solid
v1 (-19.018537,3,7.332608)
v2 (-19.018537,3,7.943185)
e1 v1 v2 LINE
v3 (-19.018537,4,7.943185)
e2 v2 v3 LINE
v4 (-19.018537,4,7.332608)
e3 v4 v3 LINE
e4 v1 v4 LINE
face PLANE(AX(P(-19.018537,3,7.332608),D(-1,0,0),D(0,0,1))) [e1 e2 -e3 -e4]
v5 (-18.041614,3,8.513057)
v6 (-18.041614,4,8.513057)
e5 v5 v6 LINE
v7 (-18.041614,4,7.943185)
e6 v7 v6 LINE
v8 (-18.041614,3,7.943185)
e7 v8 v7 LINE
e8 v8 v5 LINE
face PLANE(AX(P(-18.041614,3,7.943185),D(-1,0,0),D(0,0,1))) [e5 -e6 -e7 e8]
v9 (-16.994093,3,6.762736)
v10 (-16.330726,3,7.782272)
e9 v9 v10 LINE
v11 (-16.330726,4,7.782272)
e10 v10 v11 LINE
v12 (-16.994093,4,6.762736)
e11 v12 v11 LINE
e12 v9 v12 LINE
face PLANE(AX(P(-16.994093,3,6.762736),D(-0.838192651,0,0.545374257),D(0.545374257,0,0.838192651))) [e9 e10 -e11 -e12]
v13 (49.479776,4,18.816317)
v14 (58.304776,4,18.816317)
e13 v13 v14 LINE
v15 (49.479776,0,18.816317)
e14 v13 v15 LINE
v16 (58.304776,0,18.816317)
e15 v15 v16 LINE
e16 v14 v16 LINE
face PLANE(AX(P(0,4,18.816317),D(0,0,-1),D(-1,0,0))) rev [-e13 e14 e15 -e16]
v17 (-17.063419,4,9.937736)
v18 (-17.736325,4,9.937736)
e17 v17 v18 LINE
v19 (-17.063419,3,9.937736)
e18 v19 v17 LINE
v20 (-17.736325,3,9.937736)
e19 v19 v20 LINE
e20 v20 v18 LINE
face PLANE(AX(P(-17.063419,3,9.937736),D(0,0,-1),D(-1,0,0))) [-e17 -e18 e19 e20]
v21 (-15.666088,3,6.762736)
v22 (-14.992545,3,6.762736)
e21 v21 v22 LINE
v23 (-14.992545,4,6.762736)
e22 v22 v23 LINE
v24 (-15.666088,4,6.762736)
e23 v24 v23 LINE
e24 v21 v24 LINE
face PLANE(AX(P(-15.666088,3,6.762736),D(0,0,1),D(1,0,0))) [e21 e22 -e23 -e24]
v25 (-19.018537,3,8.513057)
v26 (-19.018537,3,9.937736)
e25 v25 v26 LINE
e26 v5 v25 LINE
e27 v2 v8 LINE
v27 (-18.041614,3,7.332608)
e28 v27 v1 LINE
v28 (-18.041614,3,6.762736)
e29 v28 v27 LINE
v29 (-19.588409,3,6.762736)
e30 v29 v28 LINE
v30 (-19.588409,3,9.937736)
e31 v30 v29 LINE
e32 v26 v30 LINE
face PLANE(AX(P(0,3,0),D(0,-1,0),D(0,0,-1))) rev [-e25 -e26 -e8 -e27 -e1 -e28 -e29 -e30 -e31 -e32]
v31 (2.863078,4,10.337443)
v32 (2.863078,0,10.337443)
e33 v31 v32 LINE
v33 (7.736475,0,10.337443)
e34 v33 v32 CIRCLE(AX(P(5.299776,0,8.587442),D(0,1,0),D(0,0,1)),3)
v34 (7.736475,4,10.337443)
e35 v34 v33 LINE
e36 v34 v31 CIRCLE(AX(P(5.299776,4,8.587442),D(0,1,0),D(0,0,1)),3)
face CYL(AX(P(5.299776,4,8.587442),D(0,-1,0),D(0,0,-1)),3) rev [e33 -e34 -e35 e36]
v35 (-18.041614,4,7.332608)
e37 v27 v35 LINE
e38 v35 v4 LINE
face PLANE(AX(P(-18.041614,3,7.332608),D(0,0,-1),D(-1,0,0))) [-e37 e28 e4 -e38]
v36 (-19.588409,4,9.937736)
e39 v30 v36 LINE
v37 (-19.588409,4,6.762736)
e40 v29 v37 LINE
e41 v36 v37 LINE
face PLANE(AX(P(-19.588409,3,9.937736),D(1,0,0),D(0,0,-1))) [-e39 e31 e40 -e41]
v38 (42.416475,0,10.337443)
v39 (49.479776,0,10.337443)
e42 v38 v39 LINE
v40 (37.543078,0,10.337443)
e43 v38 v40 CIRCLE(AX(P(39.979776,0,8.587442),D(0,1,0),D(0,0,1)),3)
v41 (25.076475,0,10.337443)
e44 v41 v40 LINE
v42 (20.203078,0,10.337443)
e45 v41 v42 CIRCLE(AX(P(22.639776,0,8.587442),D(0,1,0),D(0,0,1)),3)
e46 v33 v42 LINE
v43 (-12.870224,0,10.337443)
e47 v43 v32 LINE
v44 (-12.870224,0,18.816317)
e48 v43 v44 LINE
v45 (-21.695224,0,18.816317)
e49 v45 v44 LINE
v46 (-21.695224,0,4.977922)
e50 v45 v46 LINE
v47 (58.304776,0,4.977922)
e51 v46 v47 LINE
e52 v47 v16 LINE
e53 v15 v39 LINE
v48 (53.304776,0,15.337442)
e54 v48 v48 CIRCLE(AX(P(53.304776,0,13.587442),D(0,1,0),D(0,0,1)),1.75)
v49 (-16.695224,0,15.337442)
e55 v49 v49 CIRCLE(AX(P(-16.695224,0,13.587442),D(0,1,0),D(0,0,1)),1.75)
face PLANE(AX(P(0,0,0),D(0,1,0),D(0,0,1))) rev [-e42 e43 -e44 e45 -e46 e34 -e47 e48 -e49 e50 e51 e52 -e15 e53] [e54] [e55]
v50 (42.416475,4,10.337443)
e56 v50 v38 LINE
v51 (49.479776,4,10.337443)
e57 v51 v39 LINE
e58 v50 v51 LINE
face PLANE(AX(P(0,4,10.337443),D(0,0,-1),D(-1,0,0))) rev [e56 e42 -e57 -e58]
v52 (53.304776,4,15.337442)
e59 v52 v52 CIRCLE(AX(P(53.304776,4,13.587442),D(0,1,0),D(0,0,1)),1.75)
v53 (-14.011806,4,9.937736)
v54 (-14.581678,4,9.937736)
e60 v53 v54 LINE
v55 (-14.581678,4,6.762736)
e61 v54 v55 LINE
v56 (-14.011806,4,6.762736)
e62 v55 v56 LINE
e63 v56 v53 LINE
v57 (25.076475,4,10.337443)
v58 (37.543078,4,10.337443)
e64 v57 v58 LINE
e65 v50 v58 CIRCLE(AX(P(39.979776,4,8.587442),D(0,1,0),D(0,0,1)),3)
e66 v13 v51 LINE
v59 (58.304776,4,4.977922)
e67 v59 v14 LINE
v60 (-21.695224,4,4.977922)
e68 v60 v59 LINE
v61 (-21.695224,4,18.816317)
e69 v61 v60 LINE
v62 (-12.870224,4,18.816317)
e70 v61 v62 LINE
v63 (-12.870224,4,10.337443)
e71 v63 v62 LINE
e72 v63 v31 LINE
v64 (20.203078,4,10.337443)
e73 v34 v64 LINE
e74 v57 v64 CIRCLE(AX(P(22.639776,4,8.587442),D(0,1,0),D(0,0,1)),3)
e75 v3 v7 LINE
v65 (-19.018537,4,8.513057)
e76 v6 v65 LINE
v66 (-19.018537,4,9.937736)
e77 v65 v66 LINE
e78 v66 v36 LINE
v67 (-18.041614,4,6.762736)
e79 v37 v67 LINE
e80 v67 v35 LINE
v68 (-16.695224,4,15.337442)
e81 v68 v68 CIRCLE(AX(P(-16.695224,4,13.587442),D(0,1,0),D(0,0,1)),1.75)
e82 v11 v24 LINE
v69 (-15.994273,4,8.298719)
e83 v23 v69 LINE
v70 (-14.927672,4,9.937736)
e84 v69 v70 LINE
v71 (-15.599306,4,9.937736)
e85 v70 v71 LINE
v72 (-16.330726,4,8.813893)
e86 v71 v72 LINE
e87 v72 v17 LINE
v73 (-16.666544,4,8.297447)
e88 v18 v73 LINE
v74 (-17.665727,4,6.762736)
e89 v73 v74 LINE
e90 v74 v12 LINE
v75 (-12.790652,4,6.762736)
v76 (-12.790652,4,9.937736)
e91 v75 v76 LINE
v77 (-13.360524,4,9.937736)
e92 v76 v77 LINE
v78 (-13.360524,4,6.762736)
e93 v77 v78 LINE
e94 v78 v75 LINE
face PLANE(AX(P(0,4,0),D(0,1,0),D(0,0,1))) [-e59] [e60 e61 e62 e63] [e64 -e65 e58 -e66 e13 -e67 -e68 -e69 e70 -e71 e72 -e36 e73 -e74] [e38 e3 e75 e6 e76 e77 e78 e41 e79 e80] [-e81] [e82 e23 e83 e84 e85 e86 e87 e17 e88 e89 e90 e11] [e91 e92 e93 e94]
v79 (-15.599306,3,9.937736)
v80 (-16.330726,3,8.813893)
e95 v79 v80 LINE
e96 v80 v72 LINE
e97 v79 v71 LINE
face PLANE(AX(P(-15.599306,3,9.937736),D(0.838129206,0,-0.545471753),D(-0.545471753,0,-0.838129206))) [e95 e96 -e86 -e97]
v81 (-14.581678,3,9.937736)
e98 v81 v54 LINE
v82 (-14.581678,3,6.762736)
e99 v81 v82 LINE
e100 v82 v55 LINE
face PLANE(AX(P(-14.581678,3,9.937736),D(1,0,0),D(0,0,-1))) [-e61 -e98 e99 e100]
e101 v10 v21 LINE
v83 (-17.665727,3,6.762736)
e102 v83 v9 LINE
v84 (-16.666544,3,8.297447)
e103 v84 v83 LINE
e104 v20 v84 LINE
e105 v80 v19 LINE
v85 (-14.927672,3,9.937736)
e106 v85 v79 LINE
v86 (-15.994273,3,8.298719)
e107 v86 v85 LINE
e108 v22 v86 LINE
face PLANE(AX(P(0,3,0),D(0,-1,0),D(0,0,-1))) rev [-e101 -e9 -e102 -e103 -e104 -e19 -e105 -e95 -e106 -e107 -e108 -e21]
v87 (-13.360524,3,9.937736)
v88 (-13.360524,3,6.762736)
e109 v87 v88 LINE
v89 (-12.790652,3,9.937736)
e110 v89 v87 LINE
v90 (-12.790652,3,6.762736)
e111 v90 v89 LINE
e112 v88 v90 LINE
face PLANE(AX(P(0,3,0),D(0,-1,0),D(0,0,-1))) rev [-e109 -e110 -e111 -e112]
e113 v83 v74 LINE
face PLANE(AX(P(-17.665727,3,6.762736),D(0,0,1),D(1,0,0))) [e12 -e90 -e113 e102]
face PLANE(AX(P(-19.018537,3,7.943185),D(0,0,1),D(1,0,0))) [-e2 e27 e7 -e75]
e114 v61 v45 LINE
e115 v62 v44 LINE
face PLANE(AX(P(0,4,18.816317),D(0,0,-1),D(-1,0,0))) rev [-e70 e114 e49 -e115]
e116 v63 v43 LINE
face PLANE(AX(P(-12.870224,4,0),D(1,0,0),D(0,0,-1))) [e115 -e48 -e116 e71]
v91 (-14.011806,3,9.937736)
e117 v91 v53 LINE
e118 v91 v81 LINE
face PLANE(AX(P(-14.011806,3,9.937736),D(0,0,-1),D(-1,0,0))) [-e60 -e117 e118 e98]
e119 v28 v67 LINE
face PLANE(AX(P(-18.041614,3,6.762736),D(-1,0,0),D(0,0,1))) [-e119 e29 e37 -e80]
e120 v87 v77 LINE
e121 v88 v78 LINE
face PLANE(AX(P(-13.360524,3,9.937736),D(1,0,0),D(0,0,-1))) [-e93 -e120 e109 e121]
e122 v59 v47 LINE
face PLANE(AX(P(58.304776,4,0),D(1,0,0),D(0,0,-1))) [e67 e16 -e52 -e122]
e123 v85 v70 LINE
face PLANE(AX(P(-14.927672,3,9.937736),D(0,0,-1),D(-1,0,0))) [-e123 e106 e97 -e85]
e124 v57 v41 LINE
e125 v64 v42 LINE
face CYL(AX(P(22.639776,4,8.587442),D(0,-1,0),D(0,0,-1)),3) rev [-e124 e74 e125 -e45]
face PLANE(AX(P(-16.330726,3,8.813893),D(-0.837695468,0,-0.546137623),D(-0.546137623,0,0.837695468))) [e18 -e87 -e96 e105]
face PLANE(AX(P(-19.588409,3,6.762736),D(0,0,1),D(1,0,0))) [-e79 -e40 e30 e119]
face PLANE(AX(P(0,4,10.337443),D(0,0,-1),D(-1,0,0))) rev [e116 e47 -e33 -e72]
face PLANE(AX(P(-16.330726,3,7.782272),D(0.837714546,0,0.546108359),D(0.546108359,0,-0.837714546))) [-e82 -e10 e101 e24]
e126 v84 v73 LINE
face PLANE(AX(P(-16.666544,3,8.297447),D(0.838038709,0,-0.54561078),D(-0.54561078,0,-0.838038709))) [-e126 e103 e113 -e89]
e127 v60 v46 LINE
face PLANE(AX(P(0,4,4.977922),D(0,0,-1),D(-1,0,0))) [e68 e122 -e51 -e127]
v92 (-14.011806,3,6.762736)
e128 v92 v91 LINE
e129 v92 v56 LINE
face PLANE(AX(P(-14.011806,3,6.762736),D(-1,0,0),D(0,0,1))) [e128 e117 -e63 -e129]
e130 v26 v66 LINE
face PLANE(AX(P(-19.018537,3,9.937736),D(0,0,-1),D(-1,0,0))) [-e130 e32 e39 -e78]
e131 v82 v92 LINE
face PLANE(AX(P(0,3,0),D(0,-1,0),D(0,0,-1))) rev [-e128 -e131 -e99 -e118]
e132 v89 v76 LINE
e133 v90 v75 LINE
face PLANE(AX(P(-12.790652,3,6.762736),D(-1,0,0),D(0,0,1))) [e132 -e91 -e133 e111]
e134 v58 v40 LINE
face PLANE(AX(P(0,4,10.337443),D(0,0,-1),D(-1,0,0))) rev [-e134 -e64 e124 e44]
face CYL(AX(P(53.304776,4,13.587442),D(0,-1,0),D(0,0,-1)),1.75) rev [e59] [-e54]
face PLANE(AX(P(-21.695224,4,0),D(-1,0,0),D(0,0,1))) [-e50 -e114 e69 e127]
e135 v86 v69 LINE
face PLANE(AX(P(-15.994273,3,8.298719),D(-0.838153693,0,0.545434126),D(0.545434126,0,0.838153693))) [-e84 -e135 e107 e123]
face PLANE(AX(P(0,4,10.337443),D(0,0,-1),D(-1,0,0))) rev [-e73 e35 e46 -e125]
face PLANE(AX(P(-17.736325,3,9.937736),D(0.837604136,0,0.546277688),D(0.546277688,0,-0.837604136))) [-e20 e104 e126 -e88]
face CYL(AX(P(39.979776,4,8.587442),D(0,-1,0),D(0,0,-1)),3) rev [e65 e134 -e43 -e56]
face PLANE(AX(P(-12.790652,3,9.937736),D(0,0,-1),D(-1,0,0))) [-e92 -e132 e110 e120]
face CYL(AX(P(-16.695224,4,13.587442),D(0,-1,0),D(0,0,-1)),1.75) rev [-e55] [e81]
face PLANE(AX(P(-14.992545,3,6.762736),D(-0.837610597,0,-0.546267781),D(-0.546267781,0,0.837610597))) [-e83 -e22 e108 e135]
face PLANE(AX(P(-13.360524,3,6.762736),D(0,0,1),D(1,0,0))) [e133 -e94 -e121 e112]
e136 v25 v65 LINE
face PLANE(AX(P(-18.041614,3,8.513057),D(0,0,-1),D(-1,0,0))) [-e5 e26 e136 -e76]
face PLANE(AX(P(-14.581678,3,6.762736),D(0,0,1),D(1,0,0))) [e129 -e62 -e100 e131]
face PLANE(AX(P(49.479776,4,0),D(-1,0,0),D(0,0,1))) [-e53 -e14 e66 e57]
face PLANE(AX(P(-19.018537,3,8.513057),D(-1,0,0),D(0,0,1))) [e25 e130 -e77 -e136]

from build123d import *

# Parameters (mm, degrees)
BOSS_EXTRUDE1_OUTLINE_R = 1.75
BOSS_EXTRUDE1_DEPTH     = 4
SKETCH2_W               = 0.569871794
SKETCH2_H               = 3.175
SKETCH2_W_2             = 0.569871795
CUT_EXTRUDE1_DEPTH      = 1


# Read off the part's stored shape, not the designer's step: Boss-Extrude1
with BuildPart() as part:
    # Boss-Extrude1 outline → Boss-Extrude1 (new body)
    with BuildSketch(Plane(origin=(0, 0, 0), x_dir=(1, 0, 0), z_dir=(0, 1, 0))):
        with BuildLine():
            Line((25.076474615, -10.33744254), (37.54307775, -10.33744254))
            ThreePointArc((37.54307775, -10.33744254), (39.979776182, -5.587442326), (42.416474615, -10.33744254))
            Line((42.416474615, -10.33744254), (49.479776182, -10.33744254))
            Line((49.479776182, -10.33744254), (49.479776182, -18.81631662))
            Line((49.479776182, -18.81631662), (58.304776182, -18.81631662))
            Line((58.304776182, -18.81631662), (58.304776182, -4.977921711))
            Line((58.304776182, -4.977921711), (-21.695223818, -4.977921711))
            Line((-21.695223818, -4.977921711), (-21.695223818, -18.81631662))
            Line((-21.695223818, -18.81631662), (-12.870223818, -18.81631662))
            Line((-12.870223818, -18.81631662), (-12.870223818, -10.33744254))
            Line((-12.870223818, -10.33744254), (2.86307775, -10.33744254))
            ThreePointArc((2.86307775, -10.33744254), (5.299776182, -5.587442326), (7.736474615, -10.33744254))
            Line((7.736474615, -10.33744254), (20.20307775, -10.33744254))
            ThreePointArc((20.20307775, -10.33744254), (22.639776183, -5.587442326), (25.076474615, -10.33744254))
        make_face()
        with Locations((-16.695223818, -13.587442433)):
            Circle(BOSS_EXTRUDE1_OUTLINE_R, mode=Mode.SUBTRACT)
        with Locations((53.304776182, -13.587442433)):
            Circle(BOSS_EXTRUDE1_OUTLINE_R, mode=Mode.SUBTRACT)
    extrude(amount=BOSS_EXTRUDE1_DEPTH)

    # Sketch2 → Cut-Extrude1 (cut)
    with BuildSketch(Plane(origin=(0, 4, 0), x_dir=(1, 0, 0), z_dir=(0, 1, 0))):
        Polygon((-19.588408787, -6.762736227), (-18.041613915, -6.762736227), (-18.041613915, -7.332608022), (-19.018536992, -7.332608022), (-19.018536992, -7.943184945), (-18.041613915, -7.943184945), (-18.041613915, -8.51305674), (-19.018536992, -8.51305674), (-19.018536992, -9.937736227), (-19.588408787, -9.937736227), align=None)
        Polygon((-17.665727497, -6.762736227), (-16.994092881, -6.762736227), (-16.330726495, -7.782272485), (-15.666088073, -6.762736227), (-14.992545405, -6.762736227), (-15.99427317, -8.298718799), (-14.927671607, -9.937736227), (-15.599306223, -9.937736227), (-16.330726495, -8.813893078), (-17.063418803, -9.937736227), (-17.736325453, -9.937736227), (-16.666543803, -8.297446764), align=None)
        with Locations((-14.29674212, -8.350236227)):
            Rectangle(SKETCH2_W, SKETCH2_H)
        with Locations((-13.075588274, -8.350236227)):
            Rectangle(SKETCH2_W_2, SKETCH2_H)
    extrude(amount=-CUT_EXTRUDE1_DEPTH, mode=Mode.SUBTRACT)


solid = part.part
